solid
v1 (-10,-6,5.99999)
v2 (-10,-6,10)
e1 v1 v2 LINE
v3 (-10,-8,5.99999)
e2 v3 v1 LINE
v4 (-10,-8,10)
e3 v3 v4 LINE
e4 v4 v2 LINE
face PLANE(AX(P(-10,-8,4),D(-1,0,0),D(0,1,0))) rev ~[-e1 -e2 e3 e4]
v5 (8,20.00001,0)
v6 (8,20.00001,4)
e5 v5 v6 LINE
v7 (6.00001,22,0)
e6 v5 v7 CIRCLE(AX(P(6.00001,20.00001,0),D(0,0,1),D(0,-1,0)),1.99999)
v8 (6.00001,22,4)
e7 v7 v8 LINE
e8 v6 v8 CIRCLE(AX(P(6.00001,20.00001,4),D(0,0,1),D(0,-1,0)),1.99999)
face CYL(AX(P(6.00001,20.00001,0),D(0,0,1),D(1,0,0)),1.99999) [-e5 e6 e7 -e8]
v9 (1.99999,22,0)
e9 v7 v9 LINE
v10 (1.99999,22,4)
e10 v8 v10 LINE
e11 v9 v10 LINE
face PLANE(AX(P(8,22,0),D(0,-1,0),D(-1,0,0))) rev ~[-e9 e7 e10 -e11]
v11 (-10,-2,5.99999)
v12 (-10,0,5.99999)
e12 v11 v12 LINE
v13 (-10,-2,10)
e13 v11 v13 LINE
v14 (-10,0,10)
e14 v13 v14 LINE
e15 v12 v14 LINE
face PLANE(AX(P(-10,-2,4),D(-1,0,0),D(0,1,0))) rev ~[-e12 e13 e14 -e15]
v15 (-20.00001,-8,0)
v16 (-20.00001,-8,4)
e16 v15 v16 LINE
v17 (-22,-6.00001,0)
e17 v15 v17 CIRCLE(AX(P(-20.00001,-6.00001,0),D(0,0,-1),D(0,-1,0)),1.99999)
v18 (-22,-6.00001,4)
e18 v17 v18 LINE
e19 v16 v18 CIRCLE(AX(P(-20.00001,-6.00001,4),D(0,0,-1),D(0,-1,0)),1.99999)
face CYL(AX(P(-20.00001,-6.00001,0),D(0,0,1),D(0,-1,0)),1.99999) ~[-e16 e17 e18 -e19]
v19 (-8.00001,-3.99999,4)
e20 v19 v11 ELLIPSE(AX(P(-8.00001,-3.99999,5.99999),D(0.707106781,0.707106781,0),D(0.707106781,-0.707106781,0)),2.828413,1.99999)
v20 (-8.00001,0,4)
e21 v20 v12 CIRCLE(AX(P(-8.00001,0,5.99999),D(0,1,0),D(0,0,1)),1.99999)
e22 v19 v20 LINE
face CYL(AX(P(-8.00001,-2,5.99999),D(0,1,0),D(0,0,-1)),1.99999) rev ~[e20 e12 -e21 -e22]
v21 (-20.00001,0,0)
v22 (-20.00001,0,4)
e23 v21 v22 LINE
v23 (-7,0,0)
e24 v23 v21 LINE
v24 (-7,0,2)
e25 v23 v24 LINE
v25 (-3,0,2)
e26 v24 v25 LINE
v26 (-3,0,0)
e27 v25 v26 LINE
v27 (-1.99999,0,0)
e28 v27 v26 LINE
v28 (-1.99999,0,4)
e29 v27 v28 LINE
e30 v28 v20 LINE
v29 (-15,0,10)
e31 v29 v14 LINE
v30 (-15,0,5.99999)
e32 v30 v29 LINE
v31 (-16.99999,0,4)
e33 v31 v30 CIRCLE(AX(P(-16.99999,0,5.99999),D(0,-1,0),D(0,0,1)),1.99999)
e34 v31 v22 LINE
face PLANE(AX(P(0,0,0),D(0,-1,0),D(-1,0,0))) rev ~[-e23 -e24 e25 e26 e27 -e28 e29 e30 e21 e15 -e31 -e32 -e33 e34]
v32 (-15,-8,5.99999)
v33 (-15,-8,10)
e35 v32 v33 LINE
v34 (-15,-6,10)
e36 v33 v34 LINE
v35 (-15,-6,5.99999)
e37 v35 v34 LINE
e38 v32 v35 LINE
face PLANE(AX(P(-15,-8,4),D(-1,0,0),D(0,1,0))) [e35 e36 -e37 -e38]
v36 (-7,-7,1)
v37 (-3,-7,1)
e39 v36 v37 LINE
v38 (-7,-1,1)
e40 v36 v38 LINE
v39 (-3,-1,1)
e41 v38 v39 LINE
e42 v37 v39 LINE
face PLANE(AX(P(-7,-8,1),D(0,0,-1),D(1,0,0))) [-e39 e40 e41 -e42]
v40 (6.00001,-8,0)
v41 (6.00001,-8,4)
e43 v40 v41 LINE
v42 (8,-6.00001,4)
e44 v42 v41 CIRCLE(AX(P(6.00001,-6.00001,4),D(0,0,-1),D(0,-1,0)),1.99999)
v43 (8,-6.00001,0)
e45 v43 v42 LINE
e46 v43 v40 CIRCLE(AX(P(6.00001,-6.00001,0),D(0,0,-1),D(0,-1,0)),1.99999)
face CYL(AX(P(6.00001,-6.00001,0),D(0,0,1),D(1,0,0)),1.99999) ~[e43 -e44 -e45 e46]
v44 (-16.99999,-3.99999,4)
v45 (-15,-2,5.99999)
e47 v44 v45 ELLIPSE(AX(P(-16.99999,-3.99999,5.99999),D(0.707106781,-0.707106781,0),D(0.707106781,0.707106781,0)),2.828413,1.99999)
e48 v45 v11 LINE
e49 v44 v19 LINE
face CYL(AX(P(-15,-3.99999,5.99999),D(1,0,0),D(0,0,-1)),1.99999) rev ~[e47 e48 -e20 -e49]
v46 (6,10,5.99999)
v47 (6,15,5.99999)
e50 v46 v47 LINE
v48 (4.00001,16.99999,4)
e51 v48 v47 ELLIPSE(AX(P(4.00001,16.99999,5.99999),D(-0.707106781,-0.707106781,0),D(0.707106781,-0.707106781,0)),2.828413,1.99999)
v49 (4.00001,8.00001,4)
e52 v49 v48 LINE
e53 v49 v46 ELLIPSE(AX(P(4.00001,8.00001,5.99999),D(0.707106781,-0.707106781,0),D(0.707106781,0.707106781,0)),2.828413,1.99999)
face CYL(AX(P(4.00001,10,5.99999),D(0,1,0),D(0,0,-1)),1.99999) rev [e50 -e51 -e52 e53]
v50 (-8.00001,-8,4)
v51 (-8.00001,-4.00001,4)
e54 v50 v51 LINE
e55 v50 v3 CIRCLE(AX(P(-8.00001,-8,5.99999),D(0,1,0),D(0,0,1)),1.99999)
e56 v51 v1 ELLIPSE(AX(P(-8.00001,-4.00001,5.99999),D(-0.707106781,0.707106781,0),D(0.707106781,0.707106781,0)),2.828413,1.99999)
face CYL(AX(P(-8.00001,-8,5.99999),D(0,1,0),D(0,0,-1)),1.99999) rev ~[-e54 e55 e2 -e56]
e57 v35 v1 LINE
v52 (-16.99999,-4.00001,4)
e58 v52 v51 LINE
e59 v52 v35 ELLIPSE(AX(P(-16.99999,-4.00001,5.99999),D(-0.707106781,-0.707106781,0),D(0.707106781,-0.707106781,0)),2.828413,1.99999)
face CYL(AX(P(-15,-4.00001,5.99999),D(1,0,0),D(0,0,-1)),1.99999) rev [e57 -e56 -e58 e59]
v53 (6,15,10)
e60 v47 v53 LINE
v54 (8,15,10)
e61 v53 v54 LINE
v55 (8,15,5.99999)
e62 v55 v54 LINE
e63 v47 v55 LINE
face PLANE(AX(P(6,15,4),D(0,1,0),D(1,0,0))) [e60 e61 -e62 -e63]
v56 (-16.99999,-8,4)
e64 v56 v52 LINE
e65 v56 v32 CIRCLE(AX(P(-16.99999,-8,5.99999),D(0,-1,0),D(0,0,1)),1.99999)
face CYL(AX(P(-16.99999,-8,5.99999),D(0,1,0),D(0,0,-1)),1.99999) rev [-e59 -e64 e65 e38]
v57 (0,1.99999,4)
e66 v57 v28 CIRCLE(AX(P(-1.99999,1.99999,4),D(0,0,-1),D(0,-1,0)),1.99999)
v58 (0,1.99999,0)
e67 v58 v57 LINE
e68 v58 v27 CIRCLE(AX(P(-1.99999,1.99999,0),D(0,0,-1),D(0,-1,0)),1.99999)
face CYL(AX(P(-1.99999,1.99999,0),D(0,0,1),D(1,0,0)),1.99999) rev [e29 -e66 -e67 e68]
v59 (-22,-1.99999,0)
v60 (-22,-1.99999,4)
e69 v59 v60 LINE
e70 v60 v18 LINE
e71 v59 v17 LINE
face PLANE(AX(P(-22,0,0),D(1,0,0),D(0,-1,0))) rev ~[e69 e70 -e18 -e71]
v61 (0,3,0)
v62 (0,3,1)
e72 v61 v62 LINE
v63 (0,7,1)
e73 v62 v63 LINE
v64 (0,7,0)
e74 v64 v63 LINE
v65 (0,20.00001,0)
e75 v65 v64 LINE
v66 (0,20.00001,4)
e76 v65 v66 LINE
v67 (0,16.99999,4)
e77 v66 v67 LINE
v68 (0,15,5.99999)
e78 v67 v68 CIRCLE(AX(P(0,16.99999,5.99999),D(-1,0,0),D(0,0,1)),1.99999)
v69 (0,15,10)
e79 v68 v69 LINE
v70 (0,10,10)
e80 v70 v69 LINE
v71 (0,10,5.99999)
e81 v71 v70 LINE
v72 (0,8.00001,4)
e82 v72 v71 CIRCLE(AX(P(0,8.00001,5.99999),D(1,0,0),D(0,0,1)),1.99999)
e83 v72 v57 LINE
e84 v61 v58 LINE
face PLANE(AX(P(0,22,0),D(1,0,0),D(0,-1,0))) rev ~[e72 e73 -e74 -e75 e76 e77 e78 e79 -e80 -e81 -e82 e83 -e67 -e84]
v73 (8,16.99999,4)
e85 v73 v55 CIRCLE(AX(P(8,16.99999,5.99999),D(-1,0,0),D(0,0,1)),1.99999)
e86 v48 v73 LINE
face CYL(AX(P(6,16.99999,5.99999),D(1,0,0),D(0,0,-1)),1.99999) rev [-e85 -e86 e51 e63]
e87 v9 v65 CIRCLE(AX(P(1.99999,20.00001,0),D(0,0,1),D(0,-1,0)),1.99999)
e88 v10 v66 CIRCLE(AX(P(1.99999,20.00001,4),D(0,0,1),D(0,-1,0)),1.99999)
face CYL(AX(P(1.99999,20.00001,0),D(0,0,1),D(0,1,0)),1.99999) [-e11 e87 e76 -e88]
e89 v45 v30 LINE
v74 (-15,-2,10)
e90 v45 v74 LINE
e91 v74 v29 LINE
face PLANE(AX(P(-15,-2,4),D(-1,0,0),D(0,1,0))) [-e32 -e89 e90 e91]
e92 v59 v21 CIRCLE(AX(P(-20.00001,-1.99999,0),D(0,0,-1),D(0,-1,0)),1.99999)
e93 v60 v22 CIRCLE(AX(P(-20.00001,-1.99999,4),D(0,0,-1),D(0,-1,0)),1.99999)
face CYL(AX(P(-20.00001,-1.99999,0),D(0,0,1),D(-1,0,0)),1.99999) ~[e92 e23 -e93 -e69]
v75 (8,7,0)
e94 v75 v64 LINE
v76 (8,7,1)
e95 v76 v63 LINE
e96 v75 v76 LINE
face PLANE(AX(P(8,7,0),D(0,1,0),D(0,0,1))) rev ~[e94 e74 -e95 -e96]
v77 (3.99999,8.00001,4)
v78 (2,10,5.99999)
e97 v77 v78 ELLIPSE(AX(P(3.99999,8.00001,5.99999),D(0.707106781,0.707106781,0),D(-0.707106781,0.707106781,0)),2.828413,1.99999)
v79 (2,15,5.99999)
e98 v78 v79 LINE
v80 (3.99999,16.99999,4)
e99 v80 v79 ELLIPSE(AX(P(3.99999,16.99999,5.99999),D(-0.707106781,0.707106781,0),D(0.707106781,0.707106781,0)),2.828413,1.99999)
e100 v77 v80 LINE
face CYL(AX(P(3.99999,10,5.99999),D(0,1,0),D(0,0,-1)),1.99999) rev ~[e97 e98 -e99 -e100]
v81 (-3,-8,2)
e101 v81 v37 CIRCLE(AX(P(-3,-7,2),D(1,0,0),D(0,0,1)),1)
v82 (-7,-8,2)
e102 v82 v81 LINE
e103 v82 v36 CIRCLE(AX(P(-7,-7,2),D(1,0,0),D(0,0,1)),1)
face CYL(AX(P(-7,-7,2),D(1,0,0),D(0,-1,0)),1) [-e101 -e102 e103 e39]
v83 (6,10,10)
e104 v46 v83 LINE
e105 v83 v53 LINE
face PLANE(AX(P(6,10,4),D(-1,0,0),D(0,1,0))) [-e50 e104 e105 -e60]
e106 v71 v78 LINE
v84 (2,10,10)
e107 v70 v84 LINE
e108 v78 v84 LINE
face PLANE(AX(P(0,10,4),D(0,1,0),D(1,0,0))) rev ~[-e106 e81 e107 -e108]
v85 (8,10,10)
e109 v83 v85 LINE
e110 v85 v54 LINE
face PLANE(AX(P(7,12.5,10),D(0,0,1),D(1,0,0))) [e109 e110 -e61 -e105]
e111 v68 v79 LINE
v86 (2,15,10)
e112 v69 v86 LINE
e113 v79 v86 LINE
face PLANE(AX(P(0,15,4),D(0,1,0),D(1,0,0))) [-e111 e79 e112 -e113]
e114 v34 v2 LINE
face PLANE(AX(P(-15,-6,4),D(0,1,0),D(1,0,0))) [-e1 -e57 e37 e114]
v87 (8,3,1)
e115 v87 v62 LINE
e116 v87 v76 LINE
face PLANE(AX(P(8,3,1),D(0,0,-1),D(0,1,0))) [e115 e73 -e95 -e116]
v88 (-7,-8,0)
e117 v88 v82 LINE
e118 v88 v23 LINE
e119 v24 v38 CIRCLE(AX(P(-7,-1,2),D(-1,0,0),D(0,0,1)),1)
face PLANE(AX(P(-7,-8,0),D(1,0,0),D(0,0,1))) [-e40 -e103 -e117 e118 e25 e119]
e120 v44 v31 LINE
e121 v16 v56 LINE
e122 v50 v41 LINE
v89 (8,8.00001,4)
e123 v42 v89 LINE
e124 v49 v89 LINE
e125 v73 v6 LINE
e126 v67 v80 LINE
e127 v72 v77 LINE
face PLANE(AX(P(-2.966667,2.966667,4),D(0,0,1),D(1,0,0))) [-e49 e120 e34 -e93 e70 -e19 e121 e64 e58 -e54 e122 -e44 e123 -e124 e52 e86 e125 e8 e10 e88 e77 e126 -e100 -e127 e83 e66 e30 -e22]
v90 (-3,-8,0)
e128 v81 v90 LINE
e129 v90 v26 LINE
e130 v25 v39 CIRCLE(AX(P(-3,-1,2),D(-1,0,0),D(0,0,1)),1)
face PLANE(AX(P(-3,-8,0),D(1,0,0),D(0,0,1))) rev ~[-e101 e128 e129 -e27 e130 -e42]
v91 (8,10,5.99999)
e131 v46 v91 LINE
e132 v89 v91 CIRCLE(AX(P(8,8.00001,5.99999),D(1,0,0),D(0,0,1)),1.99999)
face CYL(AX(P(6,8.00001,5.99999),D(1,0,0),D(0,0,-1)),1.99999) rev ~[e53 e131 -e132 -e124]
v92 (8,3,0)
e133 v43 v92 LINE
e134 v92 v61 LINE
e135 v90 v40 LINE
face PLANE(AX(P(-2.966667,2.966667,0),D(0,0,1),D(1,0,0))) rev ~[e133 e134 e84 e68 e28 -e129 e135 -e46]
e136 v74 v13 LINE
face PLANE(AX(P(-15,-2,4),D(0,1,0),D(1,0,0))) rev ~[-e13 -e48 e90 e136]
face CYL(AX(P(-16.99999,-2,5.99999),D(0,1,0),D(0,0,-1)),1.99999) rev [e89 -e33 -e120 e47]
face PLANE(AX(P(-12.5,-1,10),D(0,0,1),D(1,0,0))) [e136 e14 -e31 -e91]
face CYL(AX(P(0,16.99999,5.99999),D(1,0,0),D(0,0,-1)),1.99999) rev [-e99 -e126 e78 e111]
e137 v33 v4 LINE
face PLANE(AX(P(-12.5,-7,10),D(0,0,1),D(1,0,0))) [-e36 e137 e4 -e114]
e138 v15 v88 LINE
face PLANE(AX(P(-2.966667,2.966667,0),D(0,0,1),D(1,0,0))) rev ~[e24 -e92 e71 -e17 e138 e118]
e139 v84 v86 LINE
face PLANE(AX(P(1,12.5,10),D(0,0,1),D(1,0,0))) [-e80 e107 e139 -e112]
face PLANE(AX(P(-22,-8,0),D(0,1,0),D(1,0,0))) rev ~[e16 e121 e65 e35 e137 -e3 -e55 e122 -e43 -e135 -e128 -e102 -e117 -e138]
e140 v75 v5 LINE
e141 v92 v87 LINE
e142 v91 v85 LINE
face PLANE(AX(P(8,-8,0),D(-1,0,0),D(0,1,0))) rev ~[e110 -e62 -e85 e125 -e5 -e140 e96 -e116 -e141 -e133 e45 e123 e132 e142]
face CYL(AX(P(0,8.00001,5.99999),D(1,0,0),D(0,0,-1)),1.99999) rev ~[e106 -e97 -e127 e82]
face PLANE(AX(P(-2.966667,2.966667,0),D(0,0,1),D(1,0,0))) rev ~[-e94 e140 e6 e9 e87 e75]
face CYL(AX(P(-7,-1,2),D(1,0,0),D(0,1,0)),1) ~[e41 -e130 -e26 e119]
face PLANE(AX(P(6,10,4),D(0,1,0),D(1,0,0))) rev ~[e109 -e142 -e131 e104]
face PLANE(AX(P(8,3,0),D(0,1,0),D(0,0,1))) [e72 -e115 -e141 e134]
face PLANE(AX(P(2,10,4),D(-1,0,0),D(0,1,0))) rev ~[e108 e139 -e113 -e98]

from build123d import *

# Parameters (mm, degrees)
F1_DEPTH = 4
F2_W     = 2
F2_H     = 5
F2_W_2   = 5
F2_H_2   = 2
F3_DEPTH = 6
F4_R     = 1.99999
F5_W     = 4
F5_H     = 1
F6_DEPTH = 25
F7_R     = 1
F8_W     = 4
F8_H     = 1
F9_DEPTH = 25


# Not quite as in the source:
# - a fillet or chamfer is up to 0.001 mm smaller than in the source, because OpenCascade refuses the exact size


with BuildPart() as f1:
    # F0 (on Top) → F1 (new body)
    with BuildSketch(Plane.XY):
        Polygon((8, -8), (8, 22), (0, 22), (0, 0), (-22, 0), (-22, -8), align=None)
    extrude(amount=F1_DEPTH)

    # F2 (on face) → F3 (join)
    with BuildSketch(Plane.XY.offset(4)):
        with Locations((1, 12.5)):
            Rectangle(F2_W, F2_H)
        with Locations((7, 12.5)):
            Rectangle(F2_W, F2_H)
        with Locations((-12.5, -1)):
            Rectangle(F2_W_2, F2_H_2)
        with Locations((-12.5, -7)):
            Rectangle(F2_W_2, F2_H_2)
    extrude(amount=F3_DEPTH)

    # F4 (radius 2 in the source; OpenCascade refuses exactly that, so slightly less here)
    f4_edges = [f1.edges().sort_by_distance(p)[0] for p in [
        (1, 15, 4),
        (2, 12.5, 4),
        (7, 15, 4),
        (-12.5, -6, 4),
        (-10, -7, 4),
        (1, 10, 4),
        (7, 10, 4),
        (6, 12.5, 4),
        (-15, -7, 4),
        (0, 0, 2),
        (8, -8, 2),
        (-15, -1, 4),
        (-12.5, -2, 4),
        (-10, -1, 4),
        (8, 22, 2),
        (0, 22, 2),
        (-22, -8, 2),
        (-22, 0, 2),
    ]]
    fillet(f4_edges, radius=F4_R)

    # F5 (on face) → F6 (cut)
    with BuildSketch(Plane.XZ.offset(8)):
        with Locations((-5, 0.5)):
            Rectangle(F5_W, F5_H)
    extrude(amount=-F6_DEPTH, mode=Mode.SUBTRACT)

    # F7
    f7_edges = [f1.edges().sort_by_distance(p)[0] for p in [
        (-5, -8, 1),
        (-5, 0, 1),
    ]]
    fillet(f7_edges, radius=F7_R)

    # F8 (on face) → F9 (cut)
    with BuildSketch(Plane.YZ.offset(8)):
        with Locations((5, 0.5)):
            Rectangle(F8_W, F8_H)
    extrude(amount=-F9_DEPTH, mode=Mode.SUBTRACT)


solid = f1.part
